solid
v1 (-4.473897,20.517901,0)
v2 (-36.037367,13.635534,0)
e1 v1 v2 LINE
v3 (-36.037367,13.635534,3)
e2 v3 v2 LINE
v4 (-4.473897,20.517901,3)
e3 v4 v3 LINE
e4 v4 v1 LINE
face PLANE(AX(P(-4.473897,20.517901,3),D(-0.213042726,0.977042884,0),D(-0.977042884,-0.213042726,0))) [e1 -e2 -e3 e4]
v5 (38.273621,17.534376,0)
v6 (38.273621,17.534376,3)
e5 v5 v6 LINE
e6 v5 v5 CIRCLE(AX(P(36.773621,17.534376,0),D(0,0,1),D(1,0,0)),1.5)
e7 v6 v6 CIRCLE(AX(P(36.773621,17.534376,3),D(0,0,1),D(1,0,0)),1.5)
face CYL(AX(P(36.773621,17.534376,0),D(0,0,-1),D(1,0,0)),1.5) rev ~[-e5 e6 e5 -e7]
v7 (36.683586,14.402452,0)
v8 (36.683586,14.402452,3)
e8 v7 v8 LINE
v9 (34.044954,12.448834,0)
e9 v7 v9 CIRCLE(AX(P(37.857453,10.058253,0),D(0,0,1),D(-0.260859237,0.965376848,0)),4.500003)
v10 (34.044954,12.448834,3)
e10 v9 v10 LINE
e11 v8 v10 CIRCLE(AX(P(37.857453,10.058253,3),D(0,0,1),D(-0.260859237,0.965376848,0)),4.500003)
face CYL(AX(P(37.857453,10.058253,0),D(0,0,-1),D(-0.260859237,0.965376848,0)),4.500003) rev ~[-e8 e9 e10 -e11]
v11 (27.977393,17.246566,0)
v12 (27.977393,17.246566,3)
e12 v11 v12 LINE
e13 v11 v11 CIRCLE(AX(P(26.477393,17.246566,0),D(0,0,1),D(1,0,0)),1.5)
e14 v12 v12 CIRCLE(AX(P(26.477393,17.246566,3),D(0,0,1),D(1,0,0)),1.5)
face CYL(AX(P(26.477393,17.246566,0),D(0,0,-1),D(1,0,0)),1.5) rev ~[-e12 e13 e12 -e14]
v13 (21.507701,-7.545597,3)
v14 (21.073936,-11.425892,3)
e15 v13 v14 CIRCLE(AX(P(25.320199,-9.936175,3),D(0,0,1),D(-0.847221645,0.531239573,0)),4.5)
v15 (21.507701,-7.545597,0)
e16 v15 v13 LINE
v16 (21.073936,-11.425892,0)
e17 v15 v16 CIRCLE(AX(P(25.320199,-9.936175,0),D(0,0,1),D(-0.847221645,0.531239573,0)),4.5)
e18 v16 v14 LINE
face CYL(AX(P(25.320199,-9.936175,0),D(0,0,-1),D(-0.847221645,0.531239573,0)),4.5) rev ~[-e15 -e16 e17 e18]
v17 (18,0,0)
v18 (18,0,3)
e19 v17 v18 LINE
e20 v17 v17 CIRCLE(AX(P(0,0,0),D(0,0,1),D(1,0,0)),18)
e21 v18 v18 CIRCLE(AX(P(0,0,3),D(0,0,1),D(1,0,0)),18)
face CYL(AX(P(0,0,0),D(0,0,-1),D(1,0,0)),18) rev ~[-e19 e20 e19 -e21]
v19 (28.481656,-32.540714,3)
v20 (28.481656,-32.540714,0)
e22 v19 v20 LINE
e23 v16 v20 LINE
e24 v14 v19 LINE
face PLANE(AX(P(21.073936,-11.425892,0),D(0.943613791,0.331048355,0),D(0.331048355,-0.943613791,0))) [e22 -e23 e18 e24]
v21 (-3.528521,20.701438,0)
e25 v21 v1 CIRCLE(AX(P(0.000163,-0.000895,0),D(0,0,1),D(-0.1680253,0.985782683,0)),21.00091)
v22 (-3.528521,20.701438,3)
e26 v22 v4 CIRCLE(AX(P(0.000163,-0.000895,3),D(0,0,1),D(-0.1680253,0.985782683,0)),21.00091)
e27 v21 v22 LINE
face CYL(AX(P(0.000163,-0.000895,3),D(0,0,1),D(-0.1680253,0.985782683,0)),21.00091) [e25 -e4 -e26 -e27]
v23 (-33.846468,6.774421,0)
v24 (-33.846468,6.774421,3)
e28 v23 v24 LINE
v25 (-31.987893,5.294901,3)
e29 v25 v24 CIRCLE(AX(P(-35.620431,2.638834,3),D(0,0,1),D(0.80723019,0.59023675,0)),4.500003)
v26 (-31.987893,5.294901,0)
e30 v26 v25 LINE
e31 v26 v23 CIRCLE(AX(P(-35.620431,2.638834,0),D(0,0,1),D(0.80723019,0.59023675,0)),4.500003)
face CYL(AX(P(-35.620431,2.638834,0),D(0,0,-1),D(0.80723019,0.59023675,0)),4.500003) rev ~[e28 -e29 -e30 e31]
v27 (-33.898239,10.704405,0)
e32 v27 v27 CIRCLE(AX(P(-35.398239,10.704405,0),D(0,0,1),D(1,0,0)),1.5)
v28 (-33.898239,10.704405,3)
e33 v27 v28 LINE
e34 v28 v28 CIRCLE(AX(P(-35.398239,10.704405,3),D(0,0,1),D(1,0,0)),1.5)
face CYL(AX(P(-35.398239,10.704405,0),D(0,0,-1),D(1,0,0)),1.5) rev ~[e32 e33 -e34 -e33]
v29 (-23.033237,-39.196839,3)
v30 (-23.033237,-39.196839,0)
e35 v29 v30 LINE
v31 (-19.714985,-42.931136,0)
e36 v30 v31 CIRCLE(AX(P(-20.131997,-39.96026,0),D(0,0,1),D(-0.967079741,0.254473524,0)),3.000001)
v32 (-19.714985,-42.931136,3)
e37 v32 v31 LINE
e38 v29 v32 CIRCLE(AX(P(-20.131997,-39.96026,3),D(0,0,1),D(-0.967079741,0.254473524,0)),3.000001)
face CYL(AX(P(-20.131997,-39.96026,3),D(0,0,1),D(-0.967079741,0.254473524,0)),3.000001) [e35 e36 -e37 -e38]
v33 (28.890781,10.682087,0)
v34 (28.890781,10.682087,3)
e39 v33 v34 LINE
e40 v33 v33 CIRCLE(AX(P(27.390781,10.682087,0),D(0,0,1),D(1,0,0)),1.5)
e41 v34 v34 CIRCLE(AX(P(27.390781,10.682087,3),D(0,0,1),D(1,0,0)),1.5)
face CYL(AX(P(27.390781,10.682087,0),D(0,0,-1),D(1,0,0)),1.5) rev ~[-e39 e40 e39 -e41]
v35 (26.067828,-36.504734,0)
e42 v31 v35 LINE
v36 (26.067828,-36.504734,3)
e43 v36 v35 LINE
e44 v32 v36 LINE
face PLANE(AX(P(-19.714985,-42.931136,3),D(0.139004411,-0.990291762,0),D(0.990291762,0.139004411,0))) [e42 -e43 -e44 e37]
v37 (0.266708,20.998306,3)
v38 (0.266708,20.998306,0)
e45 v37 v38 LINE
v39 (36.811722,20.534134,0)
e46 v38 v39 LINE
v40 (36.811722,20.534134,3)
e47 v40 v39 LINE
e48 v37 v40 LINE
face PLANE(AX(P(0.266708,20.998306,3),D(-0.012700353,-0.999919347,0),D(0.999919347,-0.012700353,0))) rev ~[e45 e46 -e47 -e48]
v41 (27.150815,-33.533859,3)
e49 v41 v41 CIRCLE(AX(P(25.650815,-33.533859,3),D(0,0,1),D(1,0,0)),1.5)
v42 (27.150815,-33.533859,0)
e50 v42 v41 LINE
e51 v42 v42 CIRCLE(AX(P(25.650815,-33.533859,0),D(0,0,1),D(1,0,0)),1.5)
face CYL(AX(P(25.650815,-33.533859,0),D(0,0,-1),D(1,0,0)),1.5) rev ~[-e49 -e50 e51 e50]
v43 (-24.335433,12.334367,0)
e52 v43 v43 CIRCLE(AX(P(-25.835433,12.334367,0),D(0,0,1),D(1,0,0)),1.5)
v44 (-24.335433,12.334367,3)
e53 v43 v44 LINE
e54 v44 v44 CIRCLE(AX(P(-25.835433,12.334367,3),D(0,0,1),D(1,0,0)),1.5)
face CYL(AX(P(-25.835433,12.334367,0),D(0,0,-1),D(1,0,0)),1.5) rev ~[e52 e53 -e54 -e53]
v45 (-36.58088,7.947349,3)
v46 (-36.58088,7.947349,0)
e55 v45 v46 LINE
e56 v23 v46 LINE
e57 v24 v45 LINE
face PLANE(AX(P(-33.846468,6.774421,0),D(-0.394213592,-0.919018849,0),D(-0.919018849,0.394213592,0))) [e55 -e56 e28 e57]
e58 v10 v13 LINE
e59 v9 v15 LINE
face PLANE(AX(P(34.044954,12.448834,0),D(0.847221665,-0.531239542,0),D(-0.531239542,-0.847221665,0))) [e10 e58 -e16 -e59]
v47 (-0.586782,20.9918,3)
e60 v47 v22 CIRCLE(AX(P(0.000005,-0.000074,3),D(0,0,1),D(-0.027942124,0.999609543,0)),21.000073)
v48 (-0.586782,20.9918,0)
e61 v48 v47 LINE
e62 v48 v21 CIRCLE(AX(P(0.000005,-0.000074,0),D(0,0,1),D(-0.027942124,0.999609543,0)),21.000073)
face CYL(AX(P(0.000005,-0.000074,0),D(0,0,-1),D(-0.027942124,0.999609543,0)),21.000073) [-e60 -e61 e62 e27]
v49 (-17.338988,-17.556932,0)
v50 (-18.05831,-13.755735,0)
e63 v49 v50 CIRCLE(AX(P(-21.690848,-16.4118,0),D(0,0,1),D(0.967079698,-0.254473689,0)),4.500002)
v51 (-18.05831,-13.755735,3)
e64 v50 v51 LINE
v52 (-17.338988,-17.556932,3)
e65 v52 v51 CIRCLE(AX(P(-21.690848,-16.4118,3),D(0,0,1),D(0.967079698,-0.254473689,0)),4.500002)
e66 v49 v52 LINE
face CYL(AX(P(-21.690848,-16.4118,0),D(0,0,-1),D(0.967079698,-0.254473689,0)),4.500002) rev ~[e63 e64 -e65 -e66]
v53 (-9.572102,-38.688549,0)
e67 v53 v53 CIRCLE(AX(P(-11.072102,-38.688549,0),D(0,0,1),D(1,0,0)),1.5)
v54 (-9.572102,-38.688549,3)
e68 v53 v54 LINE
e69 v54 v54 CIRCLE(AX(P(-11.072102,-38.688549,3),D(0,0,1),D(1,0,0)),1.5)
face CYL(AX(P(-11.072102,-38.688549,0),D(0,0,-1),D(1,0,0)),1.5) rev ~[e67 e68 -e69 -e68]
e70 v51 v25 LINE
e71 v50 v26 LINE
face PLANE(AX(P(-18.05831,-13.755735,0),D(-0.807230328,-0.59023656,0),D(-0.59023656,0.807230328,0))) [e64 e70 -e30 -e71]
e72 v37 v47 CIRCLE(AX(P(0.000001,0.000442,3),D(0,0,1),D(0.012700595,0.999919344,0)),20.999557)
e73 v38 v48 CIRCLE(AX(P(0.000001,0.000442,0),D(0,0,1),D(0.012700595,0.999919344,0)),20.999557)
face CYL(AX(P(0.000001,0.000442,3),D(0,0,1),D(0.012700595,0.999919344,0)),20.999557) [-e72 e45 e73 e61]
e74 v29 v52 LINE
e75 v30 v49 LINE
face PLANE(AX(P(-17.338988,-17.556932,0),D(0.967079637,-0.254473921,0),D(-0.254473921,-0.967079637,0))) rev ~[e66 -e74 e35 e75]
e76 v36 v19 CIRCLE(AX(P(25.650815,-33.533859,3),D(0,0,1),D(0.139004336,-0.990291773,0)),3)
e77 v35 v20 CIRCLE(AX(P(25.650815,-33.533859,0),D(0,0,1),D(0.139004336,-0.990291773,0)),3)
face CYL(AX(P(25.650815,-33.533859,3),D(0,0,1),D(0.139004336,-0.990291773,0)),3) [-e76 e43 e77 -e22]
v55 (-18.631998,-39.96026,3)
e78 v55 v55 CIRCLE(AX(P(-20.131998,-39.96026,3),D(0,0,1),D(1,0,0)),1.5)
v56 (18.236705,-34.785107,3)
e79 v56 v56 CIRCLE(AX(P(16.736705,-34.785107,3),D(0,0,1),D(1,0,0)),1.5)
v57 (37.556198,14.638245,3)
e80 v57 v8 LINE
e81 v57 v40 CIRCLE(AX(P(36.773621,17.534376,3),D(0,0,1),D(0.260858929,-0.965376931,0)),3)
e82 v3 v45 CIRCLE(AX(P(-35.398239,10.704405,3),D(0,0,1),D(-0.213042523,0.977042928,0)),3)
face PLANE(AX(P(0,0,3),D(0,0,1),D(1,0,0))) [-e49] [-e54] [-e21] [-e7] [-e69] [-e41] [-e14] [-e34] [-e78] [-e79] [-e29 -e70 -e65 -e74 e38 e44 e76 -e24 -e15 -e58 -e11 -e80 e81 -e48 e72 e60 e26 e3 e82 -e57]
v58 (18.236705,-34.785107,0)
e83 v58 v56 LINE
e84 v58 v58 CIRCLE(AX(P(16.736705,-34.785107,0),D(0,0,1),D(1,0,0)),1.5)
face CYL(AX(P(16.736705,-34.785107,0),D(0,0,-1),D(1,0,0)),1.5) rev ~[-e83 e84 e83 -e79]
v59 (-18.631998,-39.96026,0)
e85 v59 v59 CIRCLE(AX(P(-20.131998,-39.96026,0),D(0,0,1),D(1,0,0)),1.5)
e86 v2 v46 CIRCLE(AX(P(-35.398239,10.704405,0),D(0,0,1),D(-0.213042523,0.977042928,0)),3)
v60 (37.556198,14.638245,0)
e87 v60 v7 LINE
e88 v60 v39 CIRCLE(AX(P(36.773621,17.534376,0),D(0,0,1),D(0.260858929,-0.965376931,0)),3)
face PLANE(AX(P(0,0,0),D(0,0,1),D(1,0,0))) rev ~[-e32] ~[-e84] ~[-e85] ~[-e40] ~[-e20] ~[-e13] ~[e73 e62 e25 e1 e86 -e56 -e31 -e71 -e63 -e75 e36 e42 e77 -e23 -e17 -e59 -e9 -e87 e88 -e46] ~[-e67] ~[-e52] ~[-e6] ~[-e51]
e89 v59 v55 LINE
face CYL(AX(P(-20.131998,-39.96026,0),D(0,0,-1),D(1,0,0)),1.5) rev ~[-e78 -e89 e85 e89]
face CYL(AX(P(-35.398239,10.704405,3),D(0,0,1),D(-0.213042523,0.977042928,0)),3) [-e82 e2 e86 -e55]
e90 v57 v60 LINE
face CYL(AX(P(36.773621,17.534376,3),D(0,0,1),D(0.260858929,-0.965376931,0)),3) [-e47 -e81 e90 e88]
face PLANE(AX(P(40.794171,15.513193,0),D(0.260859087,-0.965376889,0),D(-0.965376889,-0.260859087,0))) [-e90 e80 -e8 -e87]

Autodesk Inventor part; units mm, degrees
ref_plane "YZ Plane" through (0, 0, 0) normal (1, 0, 0) x (0, 1, 0)
ref_plane "XZ Plane" through (0, 0, 0) normal (0, 1, 0) x (-1, 0, 0)
ref_plane "XY Plane" through (0, 0, 0) normal (0, 0, 1) x (1, 0, 0)
sketch "スケッチ1" plane through (0, 0, 0) normal (0, 0, 1) x (1, 0, 0)
  circle A0 centre (0, 0) radius 20.55 construction
  circle A1 centre (-21.690847, -16.4118) radius 19.1 construction
  circle A2 centre (25.320198, -9.936175) radius 19.1 construction
  circle A3 centre (-50.601037, 30.814282) radius 1.5
  circle A4 centre (5.936242, 53.5882) radius 1.5
  circle A5 centre (27.390781, 10.682087) radius 1.5
  circle A6 centre (-42.891368, 18.388671) radius 1.5
  circle A7 centre (-21.690847, -16.4118) radius 4.025
  circle A8 centre (25.320198, -9.936175) radius 4.025
  circle A9 centre (0, 0) radius 4
  line L0 (-17.878475, -18.802579) -> (-30.416782, -38.796349) construction
  arc A10 (-17.878475, -18.802579) -> (-19.249319, -12.631728) centre (-21.690847, -16.4118) ccw construction
  line L1 (-19.249319, -12.631728) -> (-39.073694, 0.17273) construction
  line L2 (37.140856, -30.852246) -> (21.88658, -12.844829) construction
  arc A11 (22.365904, -6.541746) -> (21.88658, -12.844829) centre (25.320198, -9.936175) ccw construction
  line L3 (22.365904, -6.541746) -> (40.167798, 8.951885) construction
  line L4 (-21.690847, -16.4118) -> (-99.974162, 13.5882) construction
  line L5 (-105.525669, -16.4118) -> (-21.690847, -16.4118) construction
  line L6 (-21.690847, -16.4118) -> (-101.711328, -41.4118) construction
  line L7 (25.320198, -9.936175) -> (102.538646, -46.4118) construction
  line L8 (110.474331, -16.4118) -> (25.320198, -9.936175) construction
  line L9 (25.320198, -9.936175) -> (108.686903, 8.5882) construction
  line L10 (-18.05831, -13.755735) -> (-31.987893, 5.294901) construction
  line L11 (-17.338988, -17.556932) -> (-24.536725, -44.910558) construction
  line L12 (21.507701, -7.545597) -> (34.044954, 12.448834) construction
  line L13 (21.073936, -11.425892) -> (31.605914, -41.446035) construction
  arc A12 (-24.617584, -40.320148) -> (-19.506478, -44.416573) centre (-20.131998, -39.96026) ccw
  circle A13 centre (-20.131998, -39.96026) radius 3 construction
  arc A14 (-38.987898, 7.990671) -> (-39.33593, 8.526197) centre (-35.398239, 10.704405) ccw construction
  circle A15 centre (-35.398239, 10.704405) radius 3 construction
  arc A16 (-31.987893, 5.294901) -> (-33.846468, 6.774421) centre (-35.620429, 2.638836) ccw construction
  circle A17 centre (-41.515222, -3.607342) radius 1.5
  line L14 (-33.846468, 6.774421) -> (-56.065957, 16.305484) construction
  line L15 (-41.338636, 0.889192) -> (-72.631748, 2.118122) construction
  circle A18 centre (-42.891368, 18.388671) radius 3 construction
  circle A19 centre (-35.398239, 10.704405) radius 1.5
  circle A20 centre (36.773621, 17.534376) radius 1.5
  arc A21 (40.794171, 15.513193) -> (40.193362, 20.459332) centre (36.773621, 17.534376) ccw
  circle A22 centre (25.650815, -33.533859) radius 1.5
  arc A23 (26.276335, -37.990172) -> (30.150786, -33.517807) centre (25.650815, -33.533859) ccw
  circle A24 centre (36.773621, 17.534376) radius 3 construction
  circle A25 centre (25.650815, -33.533859) radius 3 construction
  arc A26 (36.683586, 14.402452) -> (34.044954, 12.448834) centre (37.857452, 10.058256) ccw construction
  line L16 (36.683586, 14.402452) -> (64.196789, 21.836927) construction
  line L17 (43.259945, 10.055344) -> (82.927317, 8.839597) construction
  circle A27 centre (27.390781, 10.682087) radius 3 construction
  circle A28 centre (-21.690847, -16.4118) radius 7.025 construction
  circle A29 centre (25.320198, -9.936175) radius 7.025 construction
  arc A30 (40.859312, 15.648342) -> (30.150786, -33.517807) centre (146.468505, -33.102887) ccw
  arc A31 (-24.617584, -40.320148) -> (-39.182737, 8.248399) centre (-145.115849, -49.987967) ccw
  arc A32 (-52.28241, 34.988367) -> (-54.190695, 28.100548) centre (-50.601037, 30.814282) ccw
  arc A33 (9.355983, 56.513156) -> (4.254869, 57.762285) centre (5.936242, 53.5882) ccw
  line L18 (-39.182737, 8.248399) -> (-54.190695, 28.100548)
  line L19 (-52.28241, 34.988367) -> (4.254869, 57.762285)
  line L20 (9.355983, 56.513156) -> (40.193362, 20.459332)
  line L21 (-19.506478, -44.416573) -> (26.276335, -37.990172)
  circle A34 centre (-20.131998, -39.96026) radius 1.5
  line L22 (-23.886768, -42.440522) -> (-17.338988, -17.556932)
  arc A35 (-17.338988, -17.556932) -> (-18.05831, -13.755735) centre (-21.690847, -16.4118) ccw
  line L23 (-18.05831, -13.755735) -> (-31.987893, 5.294901)
  arc A36 (-31.987893, 5.294901) -> (-33.846468, 6.774421) centre (-35.620429, 2.638836) ccw
  line L24 (-33.846468, 6.774421) -> (-40.094568, 9.454547)
  line L25 (40.797436, 15.514075) -> (36.683586, 14.402452)
  arc A37 (36.683586, 14.402452) -> (34.044954, 12.448834) centre (37.857452, 10.058256) ccw
  line L26 (34.044954, 12.448834) -> (21.507701, -7.545597)
  arc A38 (21.507701, -7.545597) -> (21.073936, -11.425892) centre (25.320198, -9.936175) ccw
  line L27 (21.073936, -11.425892) -> (29.592026, -35.70569)
  circle A39 centre (0, 0) radius 10.1 construction
  circle A40 centre (25.320198, -9.936175) radius 17.1 construction
  circle A41 centre (110.474331, -16.4118) radius 28.1 construction
  circle A42 centre (62.413099, -12.756939) radius 20.1 construction
  circle A43 centre (-21.690847, -16.4118) radius 17.1 construction
  circle A44 centre (-105.525669, -16.4118) radius 28.1 construction
  line L28 (-170.91498, -81.4118) -> (490.004419, -81.4118)
  line L29 (-105.525669, -16.4118) -> (-21.690847, -16.4118) construction
  line L30 (110.474331, -16.4118) -> (25.320198, -9.936175) construction
  line L31 (110.474331, -16.4118) -> (104.150058, -0.631953)
  line L32 (104.150058, -0.631953) -> (95.593688, 20.717252) construction
  line L33 (95.593688, 20.717252) -> (70.474331, -10.4118) construction
  line L34 (70.474331, -10.4118) -> (110.474331, -16.4118) construction
  line L35 (-137.681852, 53.5882) -> (165.818568, 53.5882)
  line L36 (25.320198, -9.936175) -> (108.686903, 8.5882) construction
  line L37 (25.320198, -9.936175) -> (102.538646, -46.4118) construction
  line L38 (25.320198, -9.936175) -> (5.936242, 53.5882) construction
  line L39 (5.936242, 53.5882) -> (127.64315, 30.26217)
  line L40 (127.64315, 30.26217) -> (110.474331, -16.4118) construction
  line L41 (102.538646, -46.4118) -> (118.068109, 0.832921) construction
  line L42 (118.068109, 0.832921) -> (5.936242, 53.5882) construction
  line L43 (108.686903, 8.5882) -> (129.858294, 53.5882) construction
  line L44 (129.858294, 53.5882) -> (5.936242, 53.5882) construction
  line L45 (119.272599, 31.0882) -> (366.444098, 68.5882) construction
  line L46 (119.05874, 6.925185) -> (362.021337, 65.824902) construction
  line L47 (110.303378, -22.78944) -> (351.062397, 44.553669) construction
  line L48 (127.64315, 30.26217) -> (4.192658, 19.461651) construction
  circle A45 centre (80.474331, 23.123973) radius 3 construction
  circle A46 centre (80.474331, 23.123973) radius 1.5
  arc A47 (79.800999, 27.573313) -> (76.161969, 24.409872) centre (80.474331, 23.123973) ccw
  circle A48 centre (70.474331, -10.4118) radius 1.5
  arc A49 (66.161969, -9.125901) -> (69.424217, -14.787558) centre (70.474331, -10.4118) ccw
  circle A50 centre (150.474331, 0.5882) radius 1.5
  arc A51 (152.562257, -3.398097) -> (154.040845, 3.33228) centre (150.474331, 0.5882) ccw
  circle A52 centre (127.64315, 30.26217) radius 1.5
  arc A53 (131.281576, 32.91016) -> (126.969818, 34.71151) centre (127.64315, 30.26217) ccw
  circle A54 centre (110.474331, -16.4118) radius 5
  arc A55 (108.607462, -24.190926) -> (114.186199, -23.49855) centre (110.474331, -16.4118) ccw
  line L49 (76.161969, 24.409872) -> (66.161969, -9.125901)
  line L50 (69.424217, -14.787558) -> (108.607462, -24.190926)
  line L51 (114.186199, -23.49855) -> (152.562257, -3.398097)
  line L52 (154.040845, 3.33228) -> (131.209664, 33.00625)
  line L53 (126.969818, 34.71151) -> (79.800999, 27.573313)
  circle A56 centre (-145.525669, 0.5882) radius 1.5
  arc A57 (-149.092184, 3.33228) -> (-147.613596, -3.398097) centre (-145.525669, 0.5882) ccw
  circle A58 centre (-105.525669, -16.4118) radius 5
  arc A59 (-109.237538, -23.49855) -> (-103.6588, -24.190926) centre (-105.525669, -16.4118) ccw
  circle A60 centre (-65.525669, -10.4118) radius 1.5
  arc A61 (-64.475556, -14.787558) -> (-61.213308, -9.125901) centre (-65.525669, -10.4118) ccw
  circle A62 centre (0, 0) radius 20.05 construction
  circle A63 centre (110.474331, -16.4118) radius 30.1 construction
  circle A64 centre (62.413099, -12.756939) radius 22.1 construction
  circle A65 centre (25.320198, -9.936175) radius 19.1 construction
  circle A66 centre (0, 0) radius 12.1 construction
  circle A67 centre (-21.690847, -16.4118) radius 19.1 construction
  circle A68 centre (-105.525669, -16.4118) radius 30.1 construction
  circle A69 centre (0, 0) radius 20.55 construction
  circle A70 centre (95.593688, 20.717252) radius 4.025 construction
  circle A71 centre (95.593688, 20.717252) radius 6.025 construction
  circle A72 centre (-75.525669, 23.123973) radius 1.5
  arc A73 (-71.213308, 24.409872) -> (-74.852338, 27.573313) centre (-75.525669, 23.123973) ccw
  circle A74 centre (-122.694488, 30.26217) radius 1.5
  arc A75 (-122.021157, 34.71151) -> (-126.261003, 33.00625) centre (-122.694488, 30.26217) ccw
  line L54 (-126.261003, 33.00625) -> (-149.092184, 3.33228)
  line L55 (-147.613596, -3.398097) -> (-109.237538, -23.49855)
  line L56 (-103.6588, -24.190926) -> (-64.475556, -14.787558)
  line L57 (-61.213308, -9.125901) -> (-71.213308, 24.409872)
  line L58 (-74.852338, 27.573313) -> (-122.021157, 34.71151)
  circle A76 centre (14, -17.4118) radius 2.29213 construction
  circle A77 centre (-14, -17.4118) radius 2.29213 construction
  circle A78 centre (-14, -17.4118) radius 14 construction
  circle A79 centre (14, -17.4118) radius 14 construction
  line L59 (-170.651239, -31.4118) -> (202.86558, -31.4118)
  line L60 (5.936242, 53.5882) -> (-42.252867, 34.177029) construction
  line L61 (5.936242, 53.5882) -> (-29.404465, 15.509095) construction
  circle A80 centre (5.936242, 53.5882) radius 1.5
  arc A81 (9.961109, 55.600773) -> (4.254869, 57.762285) centre (5.936242, 53.5882) ccw
  line L62 (-21.690847, -16.4118) -> (-99.974162, 13.5882) construction
  line L63 (-21.690847, -16.4118) -> (-101.711328, -41.4118) construction
  line L64 (9.961109, 55.600773) -> (31.415648, 12.694659)
  circle A82 centre (-50.601037, 30.814282) radius 1.5
  arc A83 (-52.28241, 34.988367) -> (-54.424801, 28.441767) centre (-50.601037, 30.814282) ccw
  line L65 (4.254869, 57.762285) -> (-52.28241, 34.988367)
  line L66 (-54.424801, 28.441767) -> (-46.715132, 16.016156)
  circle A84 centre (27.390781, 10.682087) radius 3 construction
  circle A85 centre (-84.86606, 5.271327) radius 4.5 construction
  circle A86 centre (-132.017427, -1.981251) radius 4.5 construction
  line L67 (-132.701548, 2.466443) -> (-85.550181, 9.71902) construction
  arc A87 (26.900287, 6.208898) -> (31.415648, 12.694659) centre (27.390781, 10.682087) ccw
  arc A88 (-46.715132, 16.016156) -> (-43.381863, 13.915483) centre (-42.891368, 18.388671) ccw
  line L68 (-43.381863, 13.915483) -> (26.900287, 6.208898)
  circle A89 centre (-42.252867, 34.177029) radius 3 construction
  circle A90 centre (25.320198, -9.936175) radius 4.025 construction
  circle A91 centre (-21.690847, -16.4118) radius 4.025 construction
  circle A92 centre (-42.891368, 18.388671) radius 1.5
  circle A93 centre (27.390781, 10.682087) radius 1.5
  circle A94 centre (-57.813011, 39.770535) radius 4.5 construction
  circle A95 centre (-99.303951, 63.315241) radius 4.5 construction
  line L69 (5.936242, 53.5882) -> (-35.940425, 22.842004) construction
  circle A96 centre (-58.005574, -24.479052) radius 20.1 construction
  circle A97 centre (-58.005574, -24.479052) radius 22.1 construction
  line L70 (-53.326057, 39.428119) -> (-56.279689, 0.724331) construction
  circle A98 centre (-42.252867, 34.177029) radius 4.5
  dimension "d127" = 9
  dimension "d128" = 9
  dimension "d143" = 9
  dimension "d0" = 8.05
  dimension "d1" = 8.05
  dimension "d2" = 8
  dimension "d3" = 20.968
  dimension "d4" = 20.968
  dimension "d5" = 17.3498
  dimension "d6" = 17.3498
  dimension "d7" = 16.8765
  dimension "d8" = 16.8765
  dimension "d9" = 20.9359
  dimension "d10" = 20.9359
  dimension "d11" = 9
  dimension "d12" = 6
  dimension "d13" = 9
  dimension "d14" = 6
  dimension "d15" = 9
  dimension "d16" = 20.968
  dimension "d17" = 20.968
  dimension "d18" = 6
  dimension "d19" = 3
  dimension "d20" = 3
  dimension "d21" = 9
  dimension "d22" = 3
  dimension "d23" = 9
  dimension "d24" = 6
  dimension "d25" = 6
  dimension "d26" = 9
  dimension "d27" = 16.8765
  dimension "d28" = 3
  dimension "d29" = 3
  dimension "d30" = 9
  dimension "d31" = 9
  dimension "d32" = 3
  dimension "d39" = 20.2
  dimension "d40" = 34.2
  dimension "d41" = 56.2
  dimension "d42" = 40.2
  dimension "d43" = 216
  dimension "d44" = 65
  dimension "d45" = 65
  dimension "d46" = 34.2
  dimension "d47" = 56.2
  dimension "d48" = 17
  dimension "d49" = 23
  dimension "d50" = 40
  dimension "d51" = 40
  dimension "d52" = 6
  dimension "d53" = 135
  dimension "d54" = 25
  dimension "d55" = 30
  dimension "d56" = 5
  dimension "d57" = 2
  dimension "d58" = 250
  dimension "d59" = 150
  dimension "d60" = 250
  dimension "d61" = 250
  dimension "d62" = 123.823
  dimension "d63" = 123.823
  dimension "d64" = 123.823
  dimension "d65" = 6
  dimension "d66" = 3
  dimension "d67" = 9
  dimension "d68" = 3
  dimension "d69" = 9
sketch "スケッチ3" plane through (0, 0, 0) normal (0, 0, 1) x (1, 0, 0)
  line L0 (0, 0) -> (0, -41.46026)
  circle A0 centre (25.320198, -9.936175) radius 4.025
  circle A1 centre (25.650815, -33.533859) radius 1.5
  circle A2 centre (36.773621, 17.534376) radius 1.5
  arc A3 (41.059013, 16.161272) -> (32.782059, 19.61222) centre (36.773621, 17.534376) ccw
  line L1 (32.243549, -11.351383) -> (41.059013, 16.161272)
  line L2 (30.131291, -33.952594) -> (32.243549, -11.351383)
  arc A4 (21.183829, -34.077953) -> (30.131291, -33.952594) centre (25.650815, -33.533859) ccw
  line L3 (18.346737, -10.785566) -> (21.183829, -34.077953)
  arc A5 (19.088928, -6.692428) -> (18.346737, -10.785566) centre (25.320198, -9.936175) ccw
  line L4 (32.782059, 19.61222) -> (19.088928, -6.692428)
  circle A6 centre (-21.690847, -16.4118) radius 4.025
  circle A7 centre (-35.398239, 10.704405) radius 1.5
  circle A8 centre (-20.131998, -39.96026) radius 1.5
  arc A9 (-24.564595, -40.736203) -> (-15.635797, -40.145139) centre (-20.131998, -39.96026) ccw
  line L5 (-28.482017, -18.357797) -> (-24.564595, -40.736203)
  line L6 (-39.569097, 9.015043) -> (-28.482017, -18.357797)
  arc A10 (-31.564802, 13.061259) -> (-39.569097, 9.015043) centre (-35.398239, 10.704405) ccw
  line L7 (-15.706425, -12.732489) -> (-31.564802, 13.061259)
  arc A11 (-14.671778, -16.700416) -> (-15.706425, -12.732489) centre (-21.690847, -16.4118) ccw
  line L8 (-15.635797, -40.145139) -> (-14.671778, -16.700416)
  circle A12 centre (25.320198, -9.936175) radius 6
  circle A13 centre (-21.690847, -16.4118) radius 6
sketch "スケッチ2" plane through (0, 0, 0) normal (0, 0, 1) x (1, 0, 0)
  circle A0 centre (0, 0) radius 18
  circle A1 centre (-35.398239, 10.704405) radius 1.5
  line L0 (-33.846468, 6.774421) -> (-39.663363, 9.269581)
  arc A2 (-31.987893, 5.294901) -> (-33.846468, 6.774421) centre (-35.620429, 2.638836) ccw
  line L1 (-18.05831, -13.755735) -> (-31.987893, 5.294901)
  arc A3 (-17.338988, -17.556932) -> (-18.05831, -13.755735) centre (-21.690847, -16.4118) ccw
  line L2 (-17.338988, -17.556932) -> (-23.886768, -42.440522)
  line L3 (21.073936, -11.425892) -> (29.592026, -35.70569)
  arc A4 (21.507701, -7.545597) -> (21.073936, -11.425892) centre (25.320198, -9.936175) ccw
  line L4 (34.044954, 12.448834) -> (21.507701, -7.545597)
  arc A5 (36.683586, 14.402452) -> (34.044954, 12.448834) centre (37.857452, 10.058256) ccw
  line L5 (40.797436, 15.514075) -> (36.683586, 14.402452)
  circle A6 centre (36.773621, 17.534376) radius 1.5
  circle A7 centre (25.650815, -33.533859) radius 1.5
  circle A8 centre (-20.131998, -39.96026) radius 1.5
  arc A9 (-23.886768, -42.440522) -> (-19.506478, -44.416573) centre (-20.131998, -39.96026) ccw
  line L6 (-19.506478, -44.416573) -> (26.276335, -37.990172)
  arc A10 (26.276335, -37.990172) -> (29.592026, -35.70569) centre (25.650815, -33.533859) ccw
  circle A11 centre (27.390781, 10.682087) radius 1.5
  arc A12 (-36.154351, 15.140427) -> (-39.663363, 9.269581) centre (-35.398239, 10.704405) ccw
  arc A13 (40.794171, 15.513193) -> (36.647882, 22.032619) centre (36.773621, 17.534376) ccw
  arc A14 (-0.586782, 20.9918) -> (-3.528521, 20.701438) centre (0, 0) ccw
  line L7 (-36.154351, 15.140427) -> (-3.528521, 20.701438)
  line L8 (-0.586782, 20.9918) -> (36.647882, 22.032619)
  circle A15 centre (14, -17.4118) radius 14 construction
  circle A16 centre (-14, -17.4118) radius 14 construction
  line L9 (-170.651239, -31.4118) -> (202.86558, -31.4118)
  circle A17 centre (-11.072102, -38.688549) radius 3
  circle A18 centre (16.736705, -34.785107) radius 3
  circle A19 centre (26.477393, 17.246566) radius 3
  circle A20 centre (-25.835433, 12.334367) radius 3
  circle A21 centre (0, 0) radius 20.55 construction
  circle A22 centre (-25.835433, 12.334367) radius 1.5
  circle A23 centre (26.477393, 17.246566) radius 1.5
  circle A24 centre (16.736705, -34.785107) radius 1.5
  circle A25 centre (-11.072102, -38.688549) radius 1.5
  circle A26 centre (-11.072102, -38.688549) radius 4.5
  circle A27 centre (16.736705, -34.785107) radius 4.5
  circle A28 centre (26.477393, 17.246566) radius 4.5
  circle A29 centre (-25.835433, 12.334367) radius 4.5
  line L10 (32.782059, 19.61222) -> (19.088928, -6.692428)
  line L11 (-15.706425, -12.732489) -> (-31.564802, 13.061259)
  line L12 (-15.635797, -40.145139) -> (-14.671778, -16.700416)
  line L13 (18.346737, -10.785566) -> (21.183829, -34.077953)
  circle A30 centre (0, 0) radius 4
  dimension "d33" = 36
  dimension "d34" = 9
  dimension "d35" = 9
  dimension "d36" = 3
  dimension "d159" = 6
  dimension "d160" = 6
  dimension "d161" = 6
  dimension "d162" = 6
  dimension "d163" = 3
  dimension "d164" = 3
  dimension "d165" = 3
  dimension "d166" = 3
  dimension "d167" = 9
  dimension "d168" = 9
  dimension "d169" = 9
  dimension "d170" = 9
  dimension "d171" = 8
extrude "押し出し1" add sketch "スケッチ2" along normal blind 3 contours A28 | A29 | L0 A12 L7 A14 L8 A13 L5 A5 L4 A4 L3 L9 A27 L2 A3 L1 A2 | L9 L12 A26 L6 A9 L2 | L9 A27 L6 A26 L12 | A27 L9 | L9 A27 | A26 | L9 L3 A10 L6 A27 | A17 | A18 | A19 | A20 | A22 | A23 | A24 | A25
extrude "押し出し2" cut sketch "スケッチ2" along normal blind 3 contours A22 | A23 | A24 | A25
sketch "スケッチ4" plane through (0, 0, 3) normal (0, 0, 1) x (1, 0, 0)
  circle A0 centre (26.477393, 17.246566) radius 1.5
  circle A1 centre (-11.072102, -38.688549) radius 1.5
  circle A2 centre (16.736705, -34.785107) radius 1.5
  circle A3 centre (-25.835433, 12.334367) radius 1.5
  circle A4 centre (0, 0) radius 18
  circle A5 centre (27.390781, 10.682087) radius 1.5
  circle A6 centre (-20.131998, -39.96026) radius 1.5
  circle A7 centre (25.650815, -33.533859) radius 1.5
  circle A8 centre (36.773621, 17.534376) radius 1.5
  circle A9 centre (-35.398239, 10.704405) radius 1.5
  line L0 (-39.663363, 9.269581) -> (-33.846468, 6.774421)
  arc A10 (-31.987893, 5.294901) -> (-33.846468, 6.774421) centre (-35.620429, 2.638836) ccw
  line L1 (-31.987893, 5.294901) -> (-18.05831, -13.755735)
  arc A11 (-17.338988, -17.556932) -> (-18.05831, -13.755735) centre (-21.690847, -16.4118) ccw
  line L2 (-17.338988, -17.556932) -> (-23.886768, -42.440522)
  arc A12 (-23.886768, -42.440522) -> (-19.506478, -44.416573) centre (-20.131998, -39.96026) ccw
  line L3 (-19.506478, -44.416573) -> (26.276335, -37.990172)
  arc A13 (26.276335, -37.990172) -> (29.592026, -35.70569) centre (25.650815, -33.533859) ccw
  line L4 (29.592026, -35.70569) -> (21.073936, -11.425892)
  arc A14 (21.507701, -7.545597) -> (21.073936, -11.425892) centre (25.320198, -9.936175) ccw
  line L5 (21.507701, -7.545597) -> (34.044954, 12.448834)
  arc A15 (36.683586, 14.402452) -> (34.044954, 12.448834) centre (37.857452, 10.058256) ccw
  line L6 (36.683586, 14.402452) -> (40.794171, 15.513193)
  arc A16 (40.794171, 15.513193) -> (36.647882, 22.032619) centre (36.773621, 17.534376) ccw
  line L7 (36.647882, 22.032619) -> (-0.586782, 20.9918)
  arc A17 (-0.586782, 20.9918) -> (-3.528521, 20.701438) centre (0, 0) ccw
  line L8 (-3.528521, 20.701438) -> (-36.154351, 15.140427)
  arc A18 (-36.154351, 15.140427) -> (-39.663363, 9.269581) centre (-35.398239, 10.704405) ccw
  arc A19 (-36.037367, 13.635534) -> (-36.58088, 7.947349) centre (-35.398239, 10.704405) ccw
  arc A20 (-23.033237, -39.196839) -> (-19.714985, -42.931136) centre (-20.131998, -39.96026) ccw
  arc A21 (26.067828, -36.504734) -> (28.481656, -32.540714) centre (25.650815, -33.533859) ccw
  arc A22 (37.556198, 14.638245) -> (36.811722, 20.534134) centre (36.773621, 17.534376) ccw
  line L9 (-19.714985, -42.931136) -> (26.067828, -36.504734)
  line L10 (36.647882, 22.032619) -> (-0.586782, 20.9918)
  arc A23 (0.266708, 20.998306) -> (-0.586782, 20.9918) centre (0, 0) ccw
  arc A24 (-3.528521, 20.701438) -> (-4.473897, 20.517901) centre (0, 0) ccw
  line L11 (-4.473897, 20.517901) -> (-36.037367, 13.635534)
  line L12 (0.266708, 20.998306) -> (36.811722, 20.534134)
  dimension "d174" = 6
  dimension "d175" = 6
  dimension "d176" = 6
  dimension "d177" = 6
extrude "押し出し3" cut sketch "スケッチ4" against normal blind 10 contours A18 L8 A24 L11 A19 L0 | L7 A16 L6 A22 L12 A23 | A20 L9 A21 L4 A13 L3 A12 L2
equation "\"d4\" = d3"
equation "\"d6\" = d5"
equation "\"d8\" = d7"
equation "\"d10\" = d9"
equation "\"d16\" = d3"
equation "\"d17\" = d3"
equation "\"d27\" = d7"
equation "\"d46\" = d40"
equation "\"d47\" = d41"
equation "\"d63\" = d62"
equation "\"d64\" = d62"
properties part number "中間フレーム内内" material "アルミニウム 2014-T4"
